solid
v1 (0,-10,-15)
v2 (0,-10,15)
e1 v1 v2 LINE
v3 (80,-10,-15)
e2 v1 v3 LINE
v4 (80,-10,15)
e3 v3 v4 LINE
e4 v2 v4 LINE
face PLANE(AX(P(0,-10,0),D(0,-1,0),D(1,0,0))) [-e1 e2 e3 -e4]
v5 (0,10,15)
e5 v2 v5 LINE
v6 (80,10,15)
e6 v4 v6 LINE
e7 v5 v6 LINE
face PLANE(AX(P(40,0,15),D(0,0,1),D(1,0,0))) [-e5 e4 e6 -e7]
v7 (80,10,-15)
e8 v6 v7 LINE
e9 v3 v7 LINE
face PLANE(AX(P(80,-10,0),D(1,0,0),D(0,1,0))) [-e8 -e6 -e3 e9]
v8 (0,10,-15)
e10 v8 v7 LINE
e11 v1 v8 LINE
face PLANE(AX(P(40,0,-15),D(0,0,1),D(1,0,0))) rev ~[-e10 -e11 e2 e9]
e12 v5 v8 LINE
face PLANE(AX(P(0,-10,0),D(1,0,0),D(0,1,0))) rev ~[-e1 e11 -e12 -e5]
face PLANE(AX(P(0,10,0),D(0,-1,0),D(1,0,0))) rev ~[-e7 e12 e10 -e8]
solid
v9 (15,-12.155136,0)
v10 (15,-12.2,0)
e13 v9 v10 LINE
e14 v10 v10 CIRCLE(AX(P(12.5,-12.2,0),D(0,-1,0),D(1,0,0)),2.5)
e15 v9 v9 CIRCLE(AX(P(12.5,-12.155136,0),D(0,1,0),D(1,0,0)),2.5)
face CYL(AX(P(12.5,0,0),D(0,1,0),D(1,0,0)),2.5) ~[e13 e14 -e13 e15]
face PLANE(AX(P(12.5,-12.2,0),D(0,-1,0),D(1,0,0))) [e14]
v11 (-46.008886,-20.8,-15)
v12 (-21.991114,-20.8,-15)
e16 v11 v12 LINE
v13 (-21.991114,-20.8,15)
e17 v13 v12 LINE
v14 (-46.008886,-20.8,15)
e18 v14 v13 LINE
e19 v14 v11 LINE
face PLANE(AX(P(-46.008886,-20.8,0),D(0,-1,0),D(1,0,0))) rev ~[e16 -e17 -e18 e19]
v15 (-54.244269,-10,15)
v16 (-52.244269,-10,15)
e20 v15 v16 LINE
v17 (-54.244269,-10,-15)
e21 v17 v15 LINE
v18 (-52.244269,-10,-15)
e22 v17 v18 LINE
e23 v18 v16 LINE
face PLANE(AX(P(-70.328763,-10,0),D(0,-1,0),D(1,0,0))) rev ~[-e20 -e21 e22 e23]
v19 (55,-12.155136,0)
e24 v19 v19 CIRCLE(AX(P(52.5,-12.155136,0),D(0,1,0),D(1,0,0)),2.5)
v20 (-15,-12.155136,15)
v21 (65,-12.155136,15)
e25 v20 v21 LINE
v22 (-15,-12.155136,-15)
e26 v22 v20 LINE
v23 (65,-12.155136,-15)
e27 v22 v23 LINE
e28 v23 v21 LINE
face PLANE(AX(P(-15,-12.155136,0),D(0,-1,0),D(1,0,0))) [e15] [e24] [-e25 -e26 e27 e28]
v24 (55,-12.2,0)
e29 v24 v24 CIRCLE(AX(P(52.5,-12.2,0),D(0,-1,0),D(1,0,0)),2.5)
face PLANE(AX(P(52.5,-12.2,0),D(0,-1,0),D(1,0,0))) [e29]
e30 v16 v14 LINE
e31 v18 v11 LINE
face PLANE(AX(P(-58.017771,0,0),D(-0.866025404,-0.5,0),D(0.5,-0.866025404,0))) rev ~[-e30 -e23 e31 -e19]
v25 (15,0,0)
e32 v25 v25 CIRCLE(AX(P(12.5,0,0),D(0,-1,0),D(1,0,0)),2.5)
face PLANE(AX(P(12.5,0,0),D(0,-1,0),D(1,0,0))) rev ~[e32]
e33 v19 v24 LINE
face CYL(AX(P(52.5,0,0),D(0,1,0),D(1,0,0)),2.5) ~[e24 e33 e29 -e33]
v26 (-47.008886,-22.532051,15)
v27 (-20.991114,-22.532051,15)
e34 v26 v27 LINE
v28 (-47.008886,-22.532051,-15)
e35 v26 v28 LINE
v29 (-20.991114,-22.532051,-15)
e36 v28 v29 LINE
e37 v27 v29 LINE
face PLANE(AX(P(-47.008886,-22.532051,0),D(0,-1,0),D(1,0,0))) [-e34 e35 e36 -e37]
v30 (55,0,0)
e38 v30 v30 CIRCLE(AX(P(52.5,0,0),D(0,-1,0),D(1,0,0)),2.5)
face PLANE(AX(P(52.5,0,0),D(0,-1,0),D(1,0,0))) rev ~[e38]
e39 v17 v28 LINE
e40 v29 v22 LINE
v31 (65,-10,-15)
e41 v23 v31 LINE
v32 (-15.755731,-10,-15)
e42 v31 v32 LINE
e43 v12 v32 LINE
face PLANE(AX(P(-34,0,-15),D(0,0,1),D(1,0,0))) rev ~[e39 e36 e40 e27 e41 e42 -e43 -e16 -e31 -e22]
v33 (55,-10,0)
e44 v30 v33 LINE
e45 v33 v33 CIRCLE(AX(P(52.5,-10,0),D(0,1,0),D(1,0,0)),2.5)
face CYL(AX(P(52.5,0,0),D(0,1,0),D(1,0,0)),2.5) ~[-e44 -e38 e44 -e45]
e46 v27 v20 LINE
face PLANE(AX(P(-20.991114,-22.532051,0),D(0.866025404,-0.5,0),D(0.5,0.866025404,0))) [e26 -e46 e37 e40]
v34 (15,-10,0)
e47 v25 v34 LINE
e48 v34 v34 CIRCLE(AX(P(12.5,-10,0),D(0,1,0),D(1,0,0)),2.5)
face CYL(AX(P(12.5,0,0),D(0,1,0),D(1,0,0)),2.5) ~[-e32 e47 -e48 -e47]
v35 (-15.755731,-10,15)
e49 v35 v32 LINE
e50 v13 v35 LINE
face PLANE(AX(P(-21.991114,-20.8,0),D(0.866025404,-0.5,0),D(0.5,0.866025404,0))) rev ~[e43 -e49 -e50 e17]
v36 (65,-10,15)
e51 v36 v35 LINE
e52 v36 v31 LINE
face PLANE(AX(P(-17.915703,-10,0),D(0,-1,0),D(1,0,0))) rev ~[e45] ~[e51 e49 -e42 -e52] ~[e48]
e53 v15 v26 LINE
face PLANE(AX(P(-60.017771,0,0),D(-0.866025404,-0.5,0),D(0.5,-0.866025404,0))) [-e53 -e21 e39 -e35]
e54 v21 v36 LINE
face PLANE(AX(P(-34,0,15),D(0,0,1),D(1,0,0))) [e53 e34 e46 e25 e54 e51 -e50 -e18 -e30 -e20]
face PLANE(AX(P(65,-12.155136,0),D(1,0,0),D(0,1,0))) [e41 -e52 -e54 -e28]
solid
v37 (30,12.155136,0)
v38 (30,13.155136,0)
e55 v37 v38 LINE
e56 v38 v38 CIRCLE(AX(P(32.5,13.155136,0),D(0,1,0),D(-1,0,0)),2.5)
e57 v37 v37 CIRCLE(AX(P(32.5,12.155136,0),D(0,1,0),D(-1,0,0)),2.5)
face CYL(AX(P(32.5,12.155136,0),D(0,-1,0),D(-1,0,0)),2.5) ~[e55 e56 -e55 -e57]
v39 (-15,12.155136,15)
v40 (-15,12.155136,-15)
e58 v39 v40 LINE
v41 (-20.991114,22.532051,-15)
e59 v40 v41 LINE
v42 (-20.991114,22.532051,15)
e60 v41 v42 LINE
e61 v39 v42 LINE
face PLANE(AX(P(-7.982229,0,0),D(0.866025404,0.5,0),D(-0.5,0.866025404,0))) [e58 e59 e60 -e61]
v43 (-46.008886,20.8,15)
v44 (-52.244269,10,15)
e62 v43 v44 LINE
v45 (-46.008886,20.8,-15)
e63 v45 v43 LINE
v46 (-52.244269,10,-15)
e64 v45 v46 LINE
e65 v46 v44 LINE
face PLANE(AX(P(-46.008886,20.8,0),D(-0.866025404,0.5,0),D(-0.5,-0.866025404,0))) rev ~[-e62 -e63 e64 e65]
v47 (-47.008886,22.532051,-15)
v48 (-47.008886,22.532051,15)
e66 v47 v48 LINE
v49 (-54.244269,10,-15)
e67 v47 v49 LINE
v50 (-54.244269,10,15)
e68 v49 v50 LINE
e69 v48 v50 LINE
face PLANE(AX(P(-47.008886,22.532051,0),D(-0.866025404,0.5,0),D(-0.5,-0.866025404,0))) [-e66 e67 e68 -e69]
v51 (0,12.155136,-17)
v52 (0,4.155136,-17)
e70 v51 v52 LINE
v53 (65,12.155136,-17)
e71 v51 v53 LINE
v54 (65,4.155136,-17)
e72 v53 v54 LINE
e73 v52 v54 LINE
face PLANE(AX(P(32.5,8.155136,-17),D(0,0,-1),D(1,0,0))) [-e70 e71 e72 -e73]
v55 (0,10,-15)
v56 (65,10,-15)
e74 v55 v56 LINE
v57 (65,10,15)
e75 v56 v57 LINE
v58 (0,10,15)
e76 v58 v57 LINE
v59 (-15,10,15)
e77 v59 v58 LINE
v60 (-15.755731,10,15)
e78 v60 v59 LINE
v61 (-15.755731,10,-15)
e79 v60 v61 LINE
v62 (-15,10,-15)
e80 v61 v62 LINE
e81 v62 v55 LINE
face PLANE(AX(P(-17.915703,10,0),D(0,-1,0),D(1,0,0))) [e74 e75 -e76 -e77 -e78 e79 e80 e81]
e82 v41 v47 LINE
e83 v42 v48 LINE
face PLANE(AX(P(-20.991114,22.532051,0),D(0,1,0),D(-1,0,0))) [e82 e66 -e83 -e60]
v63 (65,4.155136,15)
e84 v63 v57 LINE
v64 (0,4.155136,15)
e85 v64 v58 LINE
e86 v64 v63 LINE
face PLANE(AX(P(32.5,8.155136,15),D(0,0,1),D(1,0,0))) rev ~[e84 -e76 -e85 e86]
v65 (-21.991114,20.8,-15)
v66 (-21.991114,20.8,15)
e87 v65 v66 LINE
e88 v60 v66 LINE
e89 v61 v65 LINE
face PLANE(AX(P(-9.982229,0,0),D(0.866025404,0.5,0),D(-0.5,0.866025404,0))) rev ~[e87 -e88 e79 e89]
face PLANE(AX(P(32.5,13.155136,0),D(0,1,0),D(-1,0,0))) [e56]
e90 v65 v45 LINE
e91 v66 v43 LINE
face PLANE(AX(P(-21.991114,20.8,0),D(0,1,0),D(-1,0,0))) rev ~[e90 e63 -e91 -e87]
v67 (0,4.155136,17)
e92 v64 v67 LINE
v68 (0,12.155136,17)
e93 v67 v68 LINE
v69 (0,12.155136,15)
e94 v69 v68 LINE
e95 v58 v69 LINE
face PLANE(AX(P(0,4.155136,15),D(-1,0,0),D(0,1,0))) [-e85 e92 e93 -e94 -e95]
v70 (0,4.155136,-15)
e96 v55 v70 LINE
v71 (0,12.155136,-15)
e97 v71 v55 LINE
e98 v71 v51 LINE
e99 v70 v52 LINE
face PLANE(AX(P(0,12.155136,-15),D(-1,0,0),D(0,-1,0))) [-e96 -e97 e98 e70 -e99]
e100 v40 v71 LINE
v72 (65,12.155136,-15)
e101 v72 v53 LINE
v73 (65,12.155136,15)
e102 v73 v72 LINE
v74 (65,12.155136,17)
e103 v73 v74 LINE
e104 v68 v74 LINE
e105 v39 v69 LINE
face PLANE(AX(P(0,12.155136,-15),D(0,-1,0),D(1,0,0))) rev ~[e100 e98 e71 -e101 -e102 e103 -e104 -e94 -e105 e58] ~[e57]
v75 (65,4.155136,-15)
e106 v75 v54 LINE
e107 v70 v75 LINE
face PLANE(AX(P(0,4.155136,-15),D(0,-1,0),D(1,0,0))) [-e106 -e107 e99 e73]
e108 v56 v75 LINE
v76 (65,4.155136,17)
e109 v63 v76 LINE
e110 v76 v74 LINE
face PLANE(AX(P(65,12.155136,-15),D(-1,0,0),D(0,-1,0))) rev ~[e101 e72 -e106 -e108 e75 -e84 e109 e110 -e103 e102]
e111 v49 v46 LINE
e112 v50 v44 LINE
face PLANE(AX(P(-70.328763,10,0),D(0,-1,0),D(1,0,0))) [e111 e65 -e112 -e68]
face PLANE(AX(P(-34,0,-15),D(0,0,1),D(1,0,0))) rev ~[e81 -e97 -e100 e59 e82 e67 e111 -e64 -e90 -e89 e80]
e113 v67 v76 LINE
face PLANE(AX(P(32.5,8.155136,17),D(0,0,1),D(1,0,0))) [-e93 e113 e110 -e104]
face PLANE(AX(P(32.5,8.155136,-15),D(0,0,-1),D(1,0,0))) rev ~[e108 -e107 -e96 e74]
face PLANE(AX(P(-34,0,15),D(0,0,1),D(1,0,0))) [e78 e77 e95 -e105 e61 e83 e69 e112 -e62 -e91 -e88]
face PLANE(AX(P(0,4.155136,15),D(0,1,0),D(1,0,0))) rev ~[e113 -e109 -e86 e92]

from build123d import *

# Parameters (mm, degrees)
F0_W      = 80
F0_H      = 20
F1_DEPTH  = 15
F3_DEPTH  = 50
F5_DEPTH  = 15
F7_W      = 80
F7_H      = 2.1551362713
F8_DEPTH  = 15
F9_W      = 14.0510366764
F9_H      = 20
F10_DEPTH = 20
F12_W     = 40
F12_H     = 20
F13_DEPTH = 15
F16_R     = 2.5
F17_DEPTH = 12.2
F19_W     = 65
F19_H     = 8
F20_DEPTH = 2
F22_W     = 65
F22_H     = 8
F23_DEPTH = 2
F25_R     = 2.5
F26_DEPTH = 1


# Not quite as in the source:
# - a feature of the source that left no trace in its solid (it failed there, or was rolled back) is left out


with BuildPart() as f1:
    # F0 (on Top) → F1 (new body, symmetric)
    with BuildSketch(Plane.XY):
        with Locations((40, 0)):
            Rectangle(F0_W, F0_H)
    extrude(amount=F1_DEPTH, both=True)


with BuildPart() as f3:
    # F2 (on Top) → F3 (new body, symmetric)
    with BuildSketch(Plane.XY):
        Polygon((-21.9911144009, -20.8), (-9.9822288017, 0), (-21.9911144009, 20.8), (-46.0088855991, 20.8), (-58.0177711983, 0), (-46.0088855991, -20.8), align=None)
    extrude(amount=F3_DEPTH, both=True)


with BuildPart() as f5:
    # F4 (on Top) → F5 (new body, symmetric)
    with BuildSketch(Plane.XY):
        Polygon((-20.9911144009, -22.5320508076), (-7.9822288017, 0), (-20.9911144009, 22.5320508076), (-47.0088855991, 22.5320508076), (-60.0177711983, 0), (-47.0088855991, -22.5320508076), align=None)
    extrude(amount=F5_DEPTH, both=True)

    # F6: cut F3
    add(f3.part, mode=Mode.SUBTRACT)

    # F7 (on Top) → F8, piece 2 (join, symmetric)
    with BuildSketch(Plane.XY):
        with Locations((25, -11.0775681357)):
            Rectangle(F7_W, F7_H)
    extrude(amount=F8_DEPTH, both=True)


with BuildPart() as f8:
    # F7 (on Top) → F8 (new body, symmetric)
    with BuildSketch(Plane.XY):
        with Locations((25, 11.0775681357)):
            Rectangle(F7_W, F7_H)
    extrude(amount=F8_DEPTH, both=True)

    # F19 (on offset) → F20 (join)
    with BuildSketch(Plane.XY.offset(15)):
        with Locations((32.5, 8.1551362713)):
            Rectangle(F19_W, F19_H)
    extrude(amount=F20_DEPTH)

    # F22 (on offset) → F23 (join)
    with BuildSketch(Plane(origin=(0, 0, -15), x_dir=(1, 0, 0), z_dir=(0, 0, -1))):
        with Locations((32.5, -8.1551362713)):
            Rectangle(F22_W, F22_H)
    extrude(amount=F23_DEPTH)


with BuildPart() as f10:
    # F9 (on Top) → F10 (new body, symmetric)
    with BuildSketch(Plane.XY):
        with Locations((-10.8901850181, 0)):
            Rectangle(F9_W, F9_H)
    extrude(amount=F10_DEPTH, both=True)


with BuildPart() as f5_1:
    add(f5.part)

    # F11: cut F10
    add(f10.part, mode=Mode.SUBTRACT)


with BuildPart() as f13:
    # F12 (on Top) → F13 (new body, symmetric)
    with BuildSketch(Plane.XY):
        with Locations((-50.3287625449, 0)):
            Rectangle(F12_W, F12_H)
    extrude(amount=F13_DEPTH, both=True)


with BuildPart() as f5_2:
    add(f5_1.part)

    # F14: cut F13
    add(f13.part, mode=Mode.SUBTRACT)

    # F16 (on Front) → F17 (join)
    with BuildSketch(Plane.XZ):
        with Locations((12.5, 0)):
            Circle(F16_R)
        with Locations((52.5, 0)):
            Circle(F16_R)
    extrude(amount=F17_DEPTH)


with BuildPart() as f8_1:
    add(f8.part)

    # F24: union F5
    add(f5_2.part)

    # F25 (on face) → F26 (join)
    with BuildSketch(Plane(origin=(0, 12.1551362713, 0), x_dir=(-1, 0, 0), z_dir=(0, 1, 0))):
        with Locations((-32.5, 0)):
            Circle(F25_R)
    extrude(amount=F26_DEPTH)


solid = Compound([f1.part, f8_1.part])
